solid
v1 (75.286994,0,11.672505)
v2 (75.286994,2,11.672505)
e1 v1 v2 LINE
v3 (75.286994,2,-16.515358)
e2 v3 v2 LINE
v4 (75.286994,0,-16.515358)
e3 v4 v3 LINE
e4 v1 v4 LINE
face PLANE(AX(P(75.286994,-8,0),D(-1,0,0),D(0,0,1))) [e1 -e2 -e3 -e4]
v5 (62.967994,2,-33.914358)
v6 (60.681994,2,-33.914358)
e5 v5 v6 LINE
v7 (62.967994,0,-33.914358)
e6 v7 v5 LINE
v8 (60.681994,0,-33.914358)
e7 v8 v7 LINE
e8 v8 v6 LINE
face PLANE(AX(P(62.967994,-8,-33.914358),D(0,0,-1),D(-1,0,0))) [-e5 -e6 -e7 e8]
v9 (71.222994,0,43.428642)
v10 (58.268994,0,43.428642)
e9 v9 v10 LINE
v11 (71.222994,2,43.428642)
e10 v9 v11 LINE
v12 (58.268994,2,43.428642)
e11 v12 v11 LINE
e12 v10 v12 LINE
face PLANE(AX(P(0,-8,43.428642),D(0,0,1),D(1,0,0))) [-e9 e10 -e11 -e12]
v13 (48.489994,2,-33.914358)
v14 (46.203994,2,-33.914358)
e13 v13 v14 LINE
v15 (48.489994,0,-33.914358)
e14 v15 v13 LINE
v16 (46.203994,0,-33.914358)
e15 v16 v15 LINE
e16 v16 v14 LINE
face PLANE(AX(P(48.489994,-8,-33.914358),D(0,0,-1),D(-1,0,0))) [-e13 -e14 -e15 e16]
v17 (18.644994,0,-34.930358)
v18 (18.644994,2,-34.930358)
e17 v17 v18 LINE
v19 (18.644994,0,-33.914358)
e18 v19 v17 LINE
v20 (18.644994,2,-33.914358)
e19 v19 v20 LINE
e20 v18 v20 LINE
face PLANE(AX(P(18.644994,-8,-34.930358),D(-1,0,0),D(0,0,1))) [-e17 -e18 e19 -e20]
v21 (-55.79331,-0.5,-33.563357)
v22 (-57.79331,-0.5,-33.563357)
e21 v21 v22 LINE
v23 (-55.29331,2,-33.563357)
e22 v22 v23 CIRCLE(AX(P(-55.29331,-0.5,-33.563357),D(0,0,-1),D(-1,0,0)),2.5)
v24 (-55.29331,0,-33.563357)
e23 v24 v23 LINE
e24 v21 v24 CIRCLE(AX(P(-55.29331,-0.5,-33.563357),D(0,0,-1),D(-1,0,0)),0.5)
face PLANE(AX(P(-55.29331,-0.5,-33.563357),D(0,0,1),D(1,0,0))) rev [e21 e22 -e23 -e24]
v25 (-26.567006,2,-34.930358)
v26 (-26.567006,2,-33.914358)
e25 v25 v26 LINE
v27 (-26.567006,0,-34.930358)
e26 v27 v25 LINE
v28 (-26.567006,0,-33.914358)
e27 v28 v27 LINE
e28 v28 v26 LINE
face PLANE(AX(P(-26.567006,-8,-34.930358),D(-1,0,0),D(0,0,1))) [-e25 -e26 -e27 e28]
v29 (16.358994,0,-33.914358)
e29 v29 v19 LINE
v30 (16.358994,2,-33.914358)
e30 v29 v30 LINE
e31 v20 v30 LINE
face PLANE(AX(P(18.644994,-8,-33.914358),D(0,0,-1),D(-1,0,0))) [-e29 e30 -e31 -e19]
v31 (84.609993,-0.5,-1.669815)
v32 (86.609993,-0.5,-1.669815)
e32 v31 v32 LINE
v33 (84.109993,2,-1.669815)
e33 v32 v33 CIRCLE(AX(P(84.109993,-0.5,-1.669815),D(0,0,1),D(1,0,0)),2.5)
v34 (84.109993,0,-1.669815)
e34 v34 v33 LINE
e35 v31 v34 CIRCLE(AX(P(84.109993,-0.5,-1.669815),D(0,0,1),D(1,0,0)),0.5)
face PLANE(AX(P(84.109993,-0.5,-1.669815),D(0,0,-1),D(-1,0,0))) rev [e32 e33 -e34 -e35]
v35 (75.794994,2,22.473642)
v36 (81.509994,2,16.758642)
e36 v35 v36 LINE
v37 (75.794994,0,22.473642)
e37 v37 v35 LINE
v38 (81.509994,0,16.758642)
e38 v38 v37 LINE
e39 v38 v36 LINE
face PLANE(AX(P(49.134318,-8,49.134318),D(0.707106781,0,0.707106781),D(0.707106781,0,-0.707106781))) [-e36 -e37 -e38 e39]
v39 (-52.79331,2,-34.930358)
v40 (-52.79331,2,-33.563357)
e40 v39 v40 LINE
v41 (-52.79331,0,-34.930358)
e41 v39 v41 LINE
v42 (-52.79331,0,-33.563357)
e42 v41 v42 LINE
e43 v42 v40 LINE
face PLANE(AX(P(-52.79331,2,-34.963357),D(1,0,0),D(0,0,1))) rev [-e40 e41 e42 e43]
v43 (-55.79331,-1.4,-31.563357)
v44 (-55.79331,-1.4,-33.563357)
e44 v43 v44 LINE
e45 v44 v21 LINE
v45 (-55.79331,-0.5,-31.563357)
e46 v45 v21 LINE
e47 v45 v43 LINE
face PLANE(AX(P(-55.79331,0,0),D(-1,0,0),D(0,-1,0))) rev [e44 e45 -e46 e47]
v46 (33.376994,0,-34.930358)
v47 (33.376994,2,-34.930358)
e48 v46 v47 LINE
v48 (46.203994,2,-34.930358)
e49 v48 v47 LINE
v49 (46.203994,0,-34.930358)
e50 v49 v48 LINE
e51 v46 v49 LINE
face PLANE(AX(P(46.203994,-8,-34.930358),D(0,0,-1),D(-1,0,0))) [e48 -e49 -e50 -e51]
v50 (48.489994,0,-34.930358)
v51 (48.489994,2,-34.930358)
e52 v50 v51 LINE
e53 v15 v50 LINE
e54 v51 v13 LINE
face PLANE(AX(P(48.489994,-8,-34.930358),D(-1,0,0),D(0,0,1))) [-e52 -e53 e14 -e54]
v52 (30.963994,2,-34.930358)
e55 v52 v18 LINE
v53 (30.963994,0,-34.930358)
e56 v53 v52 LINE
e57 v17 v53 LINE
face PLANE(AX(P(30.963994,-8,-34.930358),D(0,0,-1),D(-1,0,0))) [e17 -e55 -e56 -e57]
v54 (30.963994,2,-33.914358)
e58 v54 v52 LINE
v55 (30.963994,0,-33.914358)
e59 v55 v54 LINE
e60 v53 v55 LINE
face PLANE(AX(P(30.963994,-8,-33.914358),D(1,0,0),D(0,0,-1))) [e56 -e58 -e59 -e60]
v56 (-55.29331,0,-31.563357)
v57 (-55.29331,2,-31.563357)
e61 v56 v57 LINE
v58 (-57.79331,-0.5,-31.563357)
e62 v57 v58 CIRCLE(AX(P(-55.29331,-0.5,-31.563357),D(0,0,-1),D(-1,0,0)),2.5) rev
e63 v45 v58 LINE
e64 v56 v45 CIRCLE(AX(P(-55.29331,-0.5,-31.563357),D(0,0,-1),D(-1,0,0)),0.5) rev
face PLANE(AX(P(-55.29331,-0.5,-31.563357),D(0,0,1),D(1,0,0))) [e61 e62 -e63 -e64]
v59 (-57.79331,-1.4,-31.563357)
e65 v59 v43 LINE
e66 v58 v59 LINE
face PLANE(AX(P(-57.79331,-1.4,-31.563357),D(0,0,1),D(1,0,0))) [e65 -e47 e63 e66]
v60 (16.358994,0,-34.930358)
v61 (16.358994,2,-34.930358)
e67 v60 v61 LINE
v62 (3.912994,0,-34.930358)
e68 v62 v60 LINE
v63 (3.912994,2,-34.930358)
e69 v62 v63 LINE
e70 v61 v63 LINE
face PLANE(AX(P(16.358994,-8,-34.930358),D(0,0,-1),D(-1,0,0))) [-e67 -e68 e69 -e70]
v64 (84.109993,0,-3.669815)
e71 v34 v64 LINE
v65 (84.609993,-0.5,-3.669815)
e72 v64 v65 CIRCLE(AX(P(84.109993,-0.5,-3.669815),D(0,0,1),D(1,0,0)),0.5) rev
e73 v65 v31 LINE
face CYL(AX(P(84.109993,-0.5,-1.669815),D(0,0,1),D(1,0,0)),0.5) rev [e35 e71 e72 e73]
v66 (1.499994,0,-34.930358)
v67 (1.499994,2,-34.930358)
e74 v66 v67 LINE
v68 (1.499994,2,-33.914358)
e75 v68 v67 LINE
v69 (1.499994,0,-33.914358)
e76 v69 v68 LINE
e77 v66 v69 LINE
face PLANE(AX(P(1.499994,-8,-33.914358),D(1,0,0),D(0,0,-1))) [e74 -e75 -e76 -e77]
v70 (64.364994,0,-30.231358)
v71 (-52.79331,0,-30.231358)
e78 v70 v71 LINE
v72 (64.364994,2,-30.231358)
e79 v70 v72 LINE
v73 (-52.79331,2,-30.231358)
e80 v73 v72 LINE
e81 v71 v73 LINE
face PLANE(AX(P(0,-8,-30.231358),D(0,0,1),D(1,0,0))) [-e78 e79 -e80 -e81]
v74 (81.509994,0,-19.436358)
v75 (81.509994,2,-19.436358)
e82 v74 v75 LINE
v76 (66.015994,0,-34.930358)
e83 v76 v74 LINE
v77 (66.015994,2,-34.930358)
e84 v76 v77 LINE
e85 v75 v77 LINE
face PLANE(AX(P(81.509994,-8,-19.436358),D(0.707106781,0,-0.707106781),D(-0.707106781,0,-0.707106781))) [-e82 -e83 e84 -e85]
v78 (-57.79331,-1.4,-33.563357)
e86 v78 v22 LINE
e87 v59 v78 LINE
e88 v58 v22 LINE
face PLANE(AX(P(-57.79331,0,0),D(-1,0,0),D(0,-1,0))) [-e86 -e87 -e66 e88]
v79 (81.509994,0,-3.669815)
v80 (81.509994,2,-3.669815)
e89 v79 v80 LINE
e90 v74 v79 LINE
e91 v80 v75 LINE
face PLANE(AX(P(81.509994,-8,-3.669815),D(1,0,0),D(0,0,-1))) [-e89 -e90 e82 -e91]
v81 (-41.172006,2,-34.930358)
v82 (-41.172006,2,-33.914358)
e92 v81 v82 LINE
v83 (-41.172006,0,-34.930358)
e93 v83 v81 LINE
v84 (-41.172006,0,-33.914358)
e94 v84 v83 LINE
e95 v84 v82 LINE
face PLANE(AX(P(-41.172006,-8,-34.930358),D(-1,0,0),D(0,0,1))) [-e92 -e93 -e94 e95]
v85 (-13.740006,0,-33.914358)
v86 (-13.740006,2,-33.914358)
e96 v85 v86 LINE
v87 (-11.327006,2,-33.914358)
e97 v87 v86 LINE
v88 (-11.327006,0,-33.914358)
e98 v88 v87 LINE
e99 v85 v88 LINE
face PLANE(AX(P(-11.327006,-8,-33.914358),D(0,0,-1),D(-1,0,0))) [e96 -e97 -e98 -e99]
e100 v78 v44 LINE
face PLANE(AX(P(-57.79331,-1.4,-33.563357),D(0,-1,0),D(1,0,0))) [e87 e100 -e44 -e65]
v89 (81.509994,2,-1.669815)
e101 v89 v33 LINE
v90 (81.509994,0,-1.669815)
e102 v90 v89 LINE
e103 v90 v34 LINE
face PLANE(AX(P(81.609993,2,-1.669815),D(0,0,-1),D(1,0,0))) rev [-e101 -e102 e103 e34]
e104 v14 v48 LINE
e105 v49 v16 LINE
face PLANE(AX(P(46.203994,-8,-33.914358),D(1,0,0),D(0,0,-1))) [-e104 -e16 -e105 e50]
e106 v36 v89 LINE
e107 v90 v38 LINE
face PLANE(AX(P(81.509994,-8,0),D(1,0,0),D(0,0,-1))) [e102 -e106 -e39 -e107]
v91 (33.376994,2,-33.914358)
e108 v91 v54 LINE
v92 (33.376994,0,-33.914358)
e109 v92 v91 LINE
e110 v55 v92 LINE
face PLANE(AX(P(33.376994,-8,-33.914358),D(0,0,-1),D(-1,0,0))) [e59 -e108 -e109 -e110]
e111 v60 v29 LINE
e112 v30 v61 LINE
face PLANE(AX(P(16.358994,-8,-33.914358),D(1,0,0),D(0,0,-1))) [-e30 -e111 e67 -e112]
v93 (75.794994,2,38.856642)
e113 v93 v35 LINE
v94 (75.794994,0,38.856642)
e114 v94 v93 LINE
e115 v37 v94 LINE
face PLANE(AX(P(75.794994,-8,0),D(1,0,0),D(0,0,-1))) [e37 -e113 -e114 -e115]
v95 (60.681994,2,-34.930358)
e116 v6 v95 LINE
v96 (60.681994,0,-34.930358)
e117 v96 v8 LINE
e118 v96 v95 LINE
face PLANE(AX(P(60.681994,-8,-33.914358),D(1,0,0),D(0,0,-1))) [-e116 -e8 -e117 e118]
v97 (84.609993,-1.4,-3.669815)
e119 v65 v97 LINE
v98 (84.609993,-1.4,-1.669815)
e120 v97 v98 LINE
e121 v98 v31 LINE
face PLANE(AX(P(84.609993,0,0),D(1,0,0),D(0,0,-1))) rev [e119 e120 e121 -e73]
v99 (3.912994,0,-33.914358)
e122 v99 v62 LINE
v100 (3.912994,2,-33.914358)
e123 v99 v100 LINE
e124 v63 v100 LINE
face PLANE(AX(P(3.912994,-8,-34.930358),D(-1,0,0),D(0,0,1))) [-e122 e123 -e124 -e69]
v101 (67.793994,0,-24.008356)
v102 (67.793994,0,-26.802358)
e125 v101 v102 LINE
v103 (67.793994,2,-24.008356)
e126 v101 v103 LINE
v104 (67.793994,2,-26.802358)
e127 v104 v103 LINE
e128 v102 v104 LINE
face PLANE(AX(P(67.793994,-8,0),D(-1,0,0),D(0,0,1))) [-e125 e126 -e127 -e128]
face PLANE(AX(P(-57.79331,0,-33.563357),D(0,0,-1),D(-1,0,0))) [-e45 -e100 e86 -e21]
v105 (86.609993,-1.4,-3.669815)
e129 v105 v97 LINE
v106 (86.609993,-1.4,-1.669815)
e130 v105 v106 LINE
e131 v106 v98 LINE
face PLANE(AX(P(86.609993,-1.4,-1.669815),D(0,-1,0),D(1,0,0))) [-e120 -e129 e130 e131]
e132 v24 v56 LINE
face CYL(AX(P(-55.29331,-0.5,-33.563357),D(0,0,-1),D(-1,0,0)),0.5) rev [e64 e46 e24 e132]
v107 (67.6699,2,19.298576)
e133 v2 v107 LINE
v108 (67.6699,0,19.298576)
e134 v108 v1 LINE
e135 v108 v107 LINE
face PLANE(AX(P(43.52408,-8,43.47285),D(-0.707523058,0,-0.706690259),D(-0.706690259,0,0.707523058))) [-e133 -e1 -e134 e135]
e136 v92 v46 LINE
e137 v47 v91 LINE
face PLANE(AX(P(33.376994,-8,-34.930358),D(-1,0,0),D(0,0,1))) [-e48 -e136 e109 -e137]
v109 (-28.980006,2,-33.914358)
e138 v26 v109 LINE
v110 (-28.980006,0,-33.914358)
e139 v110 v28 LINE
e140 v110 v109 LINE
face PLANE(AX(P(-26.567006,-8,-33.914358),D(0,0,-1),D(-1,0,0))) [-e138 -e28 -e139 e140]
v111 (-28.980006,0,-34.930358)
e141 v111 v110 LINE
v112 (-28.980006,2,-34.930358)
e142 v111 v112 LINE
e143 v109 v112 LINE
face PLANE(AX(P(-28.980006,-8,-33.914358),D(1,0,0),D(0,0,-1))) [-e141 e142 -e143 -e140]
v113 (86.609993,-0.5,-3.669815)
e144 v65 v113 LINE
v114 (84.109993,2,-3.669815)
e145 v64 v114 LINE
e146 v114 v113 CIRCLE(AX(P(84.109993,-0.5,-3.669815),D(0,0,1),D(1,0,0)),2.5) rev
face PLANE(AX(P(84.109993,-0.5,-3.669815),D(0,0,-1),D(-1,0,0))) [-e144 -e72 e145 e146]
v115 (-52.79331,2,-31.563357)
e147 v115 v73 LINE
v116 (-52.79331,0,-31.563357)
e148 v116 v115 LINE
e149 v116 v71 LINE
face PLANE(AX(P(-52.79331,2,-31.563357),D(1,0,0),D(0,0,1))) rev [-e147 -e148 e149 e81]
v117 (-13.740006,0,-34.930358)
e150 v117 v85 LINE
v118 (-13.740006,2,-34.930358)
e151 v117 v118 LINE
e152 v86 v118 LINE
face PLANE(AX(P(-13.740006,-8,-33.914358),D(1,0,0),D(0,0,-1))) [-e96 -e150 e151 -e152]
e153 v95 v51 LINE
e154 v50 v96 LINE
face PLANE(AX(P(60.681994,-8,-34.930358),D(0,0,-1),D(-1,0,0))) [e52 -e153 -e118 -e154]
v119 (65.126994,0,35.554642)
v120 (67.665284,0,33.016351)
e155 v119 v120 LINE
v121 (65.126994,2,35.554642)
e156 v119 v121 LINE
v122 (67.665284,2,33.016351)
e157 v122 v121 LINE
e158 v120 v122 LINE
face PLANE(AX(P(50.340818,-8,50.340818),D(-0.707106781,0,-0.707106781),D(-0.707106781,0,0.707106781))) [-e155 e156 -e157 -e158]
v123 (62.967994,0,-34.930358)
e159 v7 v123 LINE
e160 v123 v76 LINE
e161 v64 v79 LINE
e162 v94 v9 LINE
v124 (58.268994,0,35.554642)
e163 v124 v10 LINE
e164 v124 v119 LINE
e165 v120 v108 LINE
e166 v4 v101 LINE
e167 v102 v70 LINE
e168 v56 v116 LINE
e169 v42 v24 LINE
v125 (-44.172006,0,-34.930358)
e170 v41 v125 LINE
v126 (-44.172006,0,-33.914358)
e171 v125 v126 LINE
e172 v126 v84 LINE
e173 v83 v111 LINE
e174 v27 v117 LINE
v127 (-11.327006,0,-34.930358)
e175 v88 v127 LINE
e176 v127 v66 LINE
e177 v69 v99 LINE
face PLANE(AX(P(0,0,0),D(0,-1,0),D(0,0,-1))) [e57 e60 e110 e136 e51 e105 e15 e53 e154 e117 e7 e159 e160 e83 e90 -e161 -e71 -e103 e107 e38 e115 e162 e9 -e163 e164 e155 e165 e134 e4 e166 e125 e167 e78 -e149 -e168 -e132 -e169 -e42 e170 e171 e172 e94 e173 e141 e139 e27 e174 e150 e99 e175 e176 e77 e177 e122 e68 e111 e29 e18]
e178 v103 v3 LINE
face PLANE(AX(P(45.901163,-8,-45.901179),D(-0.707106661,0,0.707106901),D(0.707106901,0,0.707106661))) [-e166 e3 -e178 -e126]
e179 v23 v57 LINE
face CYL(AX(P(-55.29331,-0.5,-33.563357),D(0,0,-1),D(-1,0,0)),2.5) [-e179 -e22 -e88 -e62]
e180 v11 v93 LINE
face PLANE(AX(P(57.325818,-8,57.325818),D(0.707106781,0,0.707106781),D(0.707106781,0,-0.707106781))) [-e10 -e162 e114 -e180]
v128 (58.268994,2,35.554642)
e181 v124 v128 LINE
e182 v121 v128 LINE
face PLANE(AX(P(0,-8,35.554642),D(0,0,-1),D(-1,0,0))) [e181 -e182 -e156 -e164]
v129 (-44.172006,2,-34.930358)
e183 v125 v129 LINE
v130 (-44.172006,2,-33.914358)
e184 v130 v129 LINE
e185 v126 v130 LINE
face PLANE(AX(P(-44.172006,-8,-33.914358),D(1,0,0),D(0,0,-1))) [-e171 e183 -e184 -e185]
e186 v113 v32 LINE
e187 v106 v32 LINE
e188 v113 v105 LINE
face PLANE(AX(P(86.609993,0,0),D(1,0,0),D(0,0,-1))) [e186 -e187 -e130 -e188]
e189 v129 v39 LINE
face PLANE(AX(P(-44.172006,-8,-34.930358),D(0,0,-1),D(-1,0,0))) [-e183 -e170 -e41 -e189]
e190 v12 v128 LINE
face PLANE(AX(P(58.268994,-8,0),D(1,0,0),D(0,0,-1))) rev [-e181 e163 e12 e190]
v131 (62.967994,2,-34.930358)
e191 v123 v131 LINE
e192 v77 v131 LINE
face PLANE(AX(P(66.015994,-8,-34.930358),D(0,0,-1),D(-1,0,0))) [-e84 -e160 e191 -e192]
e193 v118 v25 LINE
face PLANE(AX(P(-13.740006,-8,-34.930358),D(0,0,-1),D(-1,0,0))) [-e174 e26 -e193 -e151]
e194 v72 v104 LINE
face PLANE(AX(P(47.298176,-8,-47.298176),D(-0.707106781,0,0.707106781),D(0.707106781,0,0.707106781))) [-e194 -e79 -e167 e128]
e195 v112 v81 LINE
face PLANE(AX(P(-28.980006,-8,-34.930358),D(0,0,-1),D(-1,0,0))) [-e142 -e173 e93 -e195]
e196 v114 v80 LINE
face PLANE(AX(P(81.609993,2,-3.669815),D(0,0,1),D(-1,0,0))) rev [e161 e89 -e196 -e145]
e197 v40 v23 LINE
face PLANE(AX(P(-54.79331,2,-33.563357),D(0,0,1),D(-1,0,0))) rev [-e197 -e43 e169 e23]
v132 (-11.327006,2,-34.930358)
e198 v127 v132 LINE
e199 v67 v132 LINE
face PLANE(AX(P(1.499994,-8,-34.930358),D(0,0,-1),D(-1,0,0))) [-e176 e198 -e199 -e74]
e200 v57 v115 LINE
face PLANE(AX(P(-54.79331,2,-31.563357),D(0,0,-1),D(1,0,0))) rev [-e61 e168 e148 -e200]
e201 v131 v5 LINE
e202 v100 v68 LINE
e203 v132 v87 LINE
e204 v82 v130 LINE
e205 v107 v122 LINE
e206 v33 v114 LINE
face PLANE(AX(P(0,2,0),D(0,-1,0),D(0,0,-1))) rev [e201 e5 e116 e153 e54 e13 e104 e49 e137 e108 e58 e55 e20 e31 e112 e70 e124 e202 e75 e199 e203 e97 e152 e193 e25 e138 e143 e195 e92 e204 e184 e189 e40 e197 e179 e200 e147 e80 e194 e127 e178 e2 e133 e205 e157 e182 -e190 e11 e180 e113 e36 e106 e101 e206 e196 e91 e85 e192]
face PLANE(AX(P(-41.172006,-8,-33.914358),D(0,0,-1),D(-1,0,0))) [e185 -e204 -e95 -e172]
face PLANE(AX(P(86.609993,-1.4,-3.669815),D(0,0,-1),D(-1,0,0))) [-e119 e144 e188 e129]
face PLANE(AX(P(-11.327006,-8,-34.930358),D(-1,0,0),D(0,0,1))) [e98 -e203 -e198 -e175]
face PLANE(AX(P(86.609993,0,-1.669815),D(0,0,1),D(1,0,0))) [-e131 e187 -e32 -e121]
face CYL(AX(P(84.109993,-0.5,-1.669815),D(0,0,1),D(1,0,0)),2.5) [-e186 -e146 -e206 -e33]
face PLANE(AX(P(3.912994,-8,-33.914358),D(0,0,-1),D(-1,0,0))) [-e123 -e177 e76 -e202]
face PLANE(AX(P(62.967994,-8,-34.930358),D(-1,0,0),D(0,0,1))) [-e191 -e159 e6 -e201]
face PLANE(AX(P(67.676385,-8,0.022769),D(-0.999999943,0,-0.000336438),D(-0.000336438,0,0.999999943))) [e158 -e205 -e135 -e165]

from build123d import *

# Parameters (mm, degrees)
BOSS_EXTRUDE1_DEPTH = 2
EDGE_FLANGE1_DEPTH  = 2
EDGE_FLANGE2_DEPTH  = 2
CUT_EXTRUDE3_DEPTH  = 10


# Sheet-metal steps are written as plain solids
with BuildPart() as part:
    # Sketch2 → Boss-Extrude1 (new body)
    with BuildSketch(Plane(origin=(0, 0, 0), x_dir=(1, 0, 0), z_dir=(0, 1, 0))):
        Polygon((81.609993248, 1.669814581), (81.609993248, -16.836643227), (75.909994488, -22.536641987), (75.909994488, -38.936642207), (70.009993588, -44.836643107), (58.109994528, -44.836643107), (58.109994528, -34.336641247), (63.809993288, -34.336641247), (67.509993508, -30.636641027), (67.509993508, -19.345596807), (75.109993548, -11.745596767), (75.109993548, 16.463358753), (67.709993108, 23.863356653), (67.709993108, 26.763358473), (64.309994828, 30.163356753), (-43.190006072, 30.163356753), (-52.793309772, 30.163356753), (-52.793309772, 31.563357033), (-54.793309772, 31.563357033), (-54.793309772, 33.563357033), (-52.793309772, 33.563357033), (-52.793309772, 34.963357313), (-43.190006072, 34.963357313), (66.209993568, 34.963357313), (81.609993248, 19.563357633), (81.609993248, 3.669814581), (83.609993248, 3.669814581), (83.609993248, 1.669814581), align=None)
    extrude(amount=BOSS_EXTRUDE1_DEPTH)

    # Edge-Flange1 section (across the edge) → Edge-Flange1 (add)
    with BuildSketch(Plane(origin=(-55.793309772, 0, -31.563357033), x_dir=(1, 0, 0), z_dir=(0, 0, -1))):
        with BuildLine():
            Line((-2, 0.5), (-2, 1.4))
            Line((-2, 1.4), (0, 1.4))
            Line((0, 1.4), (0, 0.5))
            ThreePointArc((0, 0.5), (0.146446609, 0.146446609), (0.5, 0))
            Line((0.5, 0), (1, 0))
            Line((1, 0), (1, -2))
            Line((1, -2), (0.5, -2))
            ThreePointArc((0.5, -2), (-1.267766953, -1.267766953), (-2, 0.5))
        make_face()
    extrude(amount=EDGE_FLANGE1_DEPTH)

    # Edge-Flange2 section (across the edge) → Edge-Flange2 (add)
    with BuildSketch(Plane(origin=(84.609993248, 0, -3.669814581), x_dir=(-1, 0, 0), z_dir=(0, 0, 1))):
        with BuildLine():
            Line((-2, 0.5), (-2, 1.4))
            Line((-2, 1.4), (0, 1.4))
            Line((0, 1.4), (0, 0.5))
            ThreePointArc((0, 0.5), (0.146446609, 0.146446609), (0.5, 0))
            Line((0.5, 0), (1, 0))
            Line((1, 0), (1, -2))
            Line((1, -2), (0.5, -2))
            ThreePointArc((0.5, -2), (-1.267766953, -1.267766953), (-2, 0.5))
        make_face()
    extrude(amount=EDGE_FLANGE2_DEPTH)

    # Sketch13 → Cut-Extrude3 (cut)
    with BuildSketch(Plane(origin=(0, 2, 0), x_dir=(1, 0, 0), z_dir=(0, 1, 0))):
        Polygon((64.364993832, 30.231358373), (-43.077006168, 30.231358373), (-52.793309772, 30.231358373), (-52.793309772, 30.163356753), (64.309994828, 30.163356753), (67.709993108, 26.763358473), (67.709993108, 23.863356653), (75.109993548, 16.463358753), (75.109993548, -11.745596767), (67.509993508, -19.345596807), (67.509993508, -30.636641027), (63.809993288, -34.336641247), (58.109994528, -34.336641247), (58.109994528, -44.836643107), (70.009993588, -44.836643107), (75.909994488, -38.936642207), (75.909994488, -22.536641987), (81.609993248, -16.836643227), (81.609993248, 1.669814581), (81.509993832, 1.669814581), (81.509993832, -16.758641627), (75.794993832, -22.473641627), (75.794993832, -38.856641627), (71.222993832, -43.428641627), (58.268993832, -43.428641627), (58.268993832, -35.554641627), (65.126993832, -35.554641627), (67.665284412, -33.016351047), (67.669899592, -19.298575587), (75.286993832, -11.672504987), (75.286993832, 16.515358373), (67.793993832, 24.008355833), (67.793993832, 26.802358373), align=None)
        Polygon((-52.793309772, 30.163356753), (-52.793309772, 30.231358373), (-53.09278865, 30.231358373), (-53.09278865, 29.122247983), (64.073173088, 29.122247983), (66.904295046, 26.802358373), (66.904295046, 23.685270997), (74.890508664, 15.670381273), (73.855495628, -9.951608799), (66.571415804, -17.811521066), (66.392045366, -24.291741654), (65.126993832, -32.125935595), (57.650093481, -33.249786732), (57.276841603, -46.73447534), (58.268993832, -46.73447534), (69.513593476, -46.73447534), (76.944541222, -41.148796497), (77.641700893, -23.890445583), (84.109993248, -17.212504202), (84.109993248, 1.669814581), (81.609993248, 1.669814581), (81.609993248, -16.836643227), (75.909994488, -22.536641987), (75.909994488, -38.936642207), (70.009993588, -44.836643107), (58.109994528, -44.836643107), (58.109994528, -34.336641247), (63.809993288, -34.336641247), (67.509993508, -30.636641027), (67.509993508, -19.345596807), (75.109993548, -11.745596767), (75.109993548, 16.463358753), (67.709993108, 23.863356653), (67.709993108, 26.763358473), (64.309994828, 30.163356753), align=None)
        Polygon((84.109993248, 19.032357692), (84.109993248, 3.669814581), (81.509993832, 3.669814581), (81.509993832, 19.436358373), (66.015993832, 34.930358373), (62.967993832, 34.930358373), (62.967993832, 33.914358373), (60.681993832, 33.914358373), (60.681993832, 34.930358373), (48.489993832, 34.930358373), (48.489993832, 33.914358373), (46.203993832, 33.914358373), (46.203993832, 34.930358373), (33.376993832, 34.930358373), (33.376993832, 33.914358373), (30.963993832, 33.914358373), (30.963993832, 34.930358373), (18.644993832, 34.930358373), (18.644993832, 33.914358373), (16.358993832, 33.914358373), (16.358993832, 34.930358373), (3.912993832, 34.930358373), (3.912993832, 33.914358373), (1.499993832, 33.914358373), (1.499993832, 34.930358373), (-11.327006168, 34.930358373), (-11.327006168, 33.914358373), (-13.740006168, 33.914358373), (-13.740006168, 34.930358373), (-26.567006168, 34.930358373), (-26.567006168, 33.914358373), (-28.980006168, 33.914358373), (-28.980006168, 34.930358373), (-41.172006168, 34.930358373), (-41.172006168, 33.914358373), (-44.172006168, 33.914358373), (-44.172006168, 34.930358373), (-54.307784522, 34.930358373), (-54.307784522, 35.697895733), (66.904295046, 35.697895733), align=None)
    extrude(amount=-CUT_EXTRUDE3_DEPTH, mode=Mode.SUBTRACT)


solid = part.part
